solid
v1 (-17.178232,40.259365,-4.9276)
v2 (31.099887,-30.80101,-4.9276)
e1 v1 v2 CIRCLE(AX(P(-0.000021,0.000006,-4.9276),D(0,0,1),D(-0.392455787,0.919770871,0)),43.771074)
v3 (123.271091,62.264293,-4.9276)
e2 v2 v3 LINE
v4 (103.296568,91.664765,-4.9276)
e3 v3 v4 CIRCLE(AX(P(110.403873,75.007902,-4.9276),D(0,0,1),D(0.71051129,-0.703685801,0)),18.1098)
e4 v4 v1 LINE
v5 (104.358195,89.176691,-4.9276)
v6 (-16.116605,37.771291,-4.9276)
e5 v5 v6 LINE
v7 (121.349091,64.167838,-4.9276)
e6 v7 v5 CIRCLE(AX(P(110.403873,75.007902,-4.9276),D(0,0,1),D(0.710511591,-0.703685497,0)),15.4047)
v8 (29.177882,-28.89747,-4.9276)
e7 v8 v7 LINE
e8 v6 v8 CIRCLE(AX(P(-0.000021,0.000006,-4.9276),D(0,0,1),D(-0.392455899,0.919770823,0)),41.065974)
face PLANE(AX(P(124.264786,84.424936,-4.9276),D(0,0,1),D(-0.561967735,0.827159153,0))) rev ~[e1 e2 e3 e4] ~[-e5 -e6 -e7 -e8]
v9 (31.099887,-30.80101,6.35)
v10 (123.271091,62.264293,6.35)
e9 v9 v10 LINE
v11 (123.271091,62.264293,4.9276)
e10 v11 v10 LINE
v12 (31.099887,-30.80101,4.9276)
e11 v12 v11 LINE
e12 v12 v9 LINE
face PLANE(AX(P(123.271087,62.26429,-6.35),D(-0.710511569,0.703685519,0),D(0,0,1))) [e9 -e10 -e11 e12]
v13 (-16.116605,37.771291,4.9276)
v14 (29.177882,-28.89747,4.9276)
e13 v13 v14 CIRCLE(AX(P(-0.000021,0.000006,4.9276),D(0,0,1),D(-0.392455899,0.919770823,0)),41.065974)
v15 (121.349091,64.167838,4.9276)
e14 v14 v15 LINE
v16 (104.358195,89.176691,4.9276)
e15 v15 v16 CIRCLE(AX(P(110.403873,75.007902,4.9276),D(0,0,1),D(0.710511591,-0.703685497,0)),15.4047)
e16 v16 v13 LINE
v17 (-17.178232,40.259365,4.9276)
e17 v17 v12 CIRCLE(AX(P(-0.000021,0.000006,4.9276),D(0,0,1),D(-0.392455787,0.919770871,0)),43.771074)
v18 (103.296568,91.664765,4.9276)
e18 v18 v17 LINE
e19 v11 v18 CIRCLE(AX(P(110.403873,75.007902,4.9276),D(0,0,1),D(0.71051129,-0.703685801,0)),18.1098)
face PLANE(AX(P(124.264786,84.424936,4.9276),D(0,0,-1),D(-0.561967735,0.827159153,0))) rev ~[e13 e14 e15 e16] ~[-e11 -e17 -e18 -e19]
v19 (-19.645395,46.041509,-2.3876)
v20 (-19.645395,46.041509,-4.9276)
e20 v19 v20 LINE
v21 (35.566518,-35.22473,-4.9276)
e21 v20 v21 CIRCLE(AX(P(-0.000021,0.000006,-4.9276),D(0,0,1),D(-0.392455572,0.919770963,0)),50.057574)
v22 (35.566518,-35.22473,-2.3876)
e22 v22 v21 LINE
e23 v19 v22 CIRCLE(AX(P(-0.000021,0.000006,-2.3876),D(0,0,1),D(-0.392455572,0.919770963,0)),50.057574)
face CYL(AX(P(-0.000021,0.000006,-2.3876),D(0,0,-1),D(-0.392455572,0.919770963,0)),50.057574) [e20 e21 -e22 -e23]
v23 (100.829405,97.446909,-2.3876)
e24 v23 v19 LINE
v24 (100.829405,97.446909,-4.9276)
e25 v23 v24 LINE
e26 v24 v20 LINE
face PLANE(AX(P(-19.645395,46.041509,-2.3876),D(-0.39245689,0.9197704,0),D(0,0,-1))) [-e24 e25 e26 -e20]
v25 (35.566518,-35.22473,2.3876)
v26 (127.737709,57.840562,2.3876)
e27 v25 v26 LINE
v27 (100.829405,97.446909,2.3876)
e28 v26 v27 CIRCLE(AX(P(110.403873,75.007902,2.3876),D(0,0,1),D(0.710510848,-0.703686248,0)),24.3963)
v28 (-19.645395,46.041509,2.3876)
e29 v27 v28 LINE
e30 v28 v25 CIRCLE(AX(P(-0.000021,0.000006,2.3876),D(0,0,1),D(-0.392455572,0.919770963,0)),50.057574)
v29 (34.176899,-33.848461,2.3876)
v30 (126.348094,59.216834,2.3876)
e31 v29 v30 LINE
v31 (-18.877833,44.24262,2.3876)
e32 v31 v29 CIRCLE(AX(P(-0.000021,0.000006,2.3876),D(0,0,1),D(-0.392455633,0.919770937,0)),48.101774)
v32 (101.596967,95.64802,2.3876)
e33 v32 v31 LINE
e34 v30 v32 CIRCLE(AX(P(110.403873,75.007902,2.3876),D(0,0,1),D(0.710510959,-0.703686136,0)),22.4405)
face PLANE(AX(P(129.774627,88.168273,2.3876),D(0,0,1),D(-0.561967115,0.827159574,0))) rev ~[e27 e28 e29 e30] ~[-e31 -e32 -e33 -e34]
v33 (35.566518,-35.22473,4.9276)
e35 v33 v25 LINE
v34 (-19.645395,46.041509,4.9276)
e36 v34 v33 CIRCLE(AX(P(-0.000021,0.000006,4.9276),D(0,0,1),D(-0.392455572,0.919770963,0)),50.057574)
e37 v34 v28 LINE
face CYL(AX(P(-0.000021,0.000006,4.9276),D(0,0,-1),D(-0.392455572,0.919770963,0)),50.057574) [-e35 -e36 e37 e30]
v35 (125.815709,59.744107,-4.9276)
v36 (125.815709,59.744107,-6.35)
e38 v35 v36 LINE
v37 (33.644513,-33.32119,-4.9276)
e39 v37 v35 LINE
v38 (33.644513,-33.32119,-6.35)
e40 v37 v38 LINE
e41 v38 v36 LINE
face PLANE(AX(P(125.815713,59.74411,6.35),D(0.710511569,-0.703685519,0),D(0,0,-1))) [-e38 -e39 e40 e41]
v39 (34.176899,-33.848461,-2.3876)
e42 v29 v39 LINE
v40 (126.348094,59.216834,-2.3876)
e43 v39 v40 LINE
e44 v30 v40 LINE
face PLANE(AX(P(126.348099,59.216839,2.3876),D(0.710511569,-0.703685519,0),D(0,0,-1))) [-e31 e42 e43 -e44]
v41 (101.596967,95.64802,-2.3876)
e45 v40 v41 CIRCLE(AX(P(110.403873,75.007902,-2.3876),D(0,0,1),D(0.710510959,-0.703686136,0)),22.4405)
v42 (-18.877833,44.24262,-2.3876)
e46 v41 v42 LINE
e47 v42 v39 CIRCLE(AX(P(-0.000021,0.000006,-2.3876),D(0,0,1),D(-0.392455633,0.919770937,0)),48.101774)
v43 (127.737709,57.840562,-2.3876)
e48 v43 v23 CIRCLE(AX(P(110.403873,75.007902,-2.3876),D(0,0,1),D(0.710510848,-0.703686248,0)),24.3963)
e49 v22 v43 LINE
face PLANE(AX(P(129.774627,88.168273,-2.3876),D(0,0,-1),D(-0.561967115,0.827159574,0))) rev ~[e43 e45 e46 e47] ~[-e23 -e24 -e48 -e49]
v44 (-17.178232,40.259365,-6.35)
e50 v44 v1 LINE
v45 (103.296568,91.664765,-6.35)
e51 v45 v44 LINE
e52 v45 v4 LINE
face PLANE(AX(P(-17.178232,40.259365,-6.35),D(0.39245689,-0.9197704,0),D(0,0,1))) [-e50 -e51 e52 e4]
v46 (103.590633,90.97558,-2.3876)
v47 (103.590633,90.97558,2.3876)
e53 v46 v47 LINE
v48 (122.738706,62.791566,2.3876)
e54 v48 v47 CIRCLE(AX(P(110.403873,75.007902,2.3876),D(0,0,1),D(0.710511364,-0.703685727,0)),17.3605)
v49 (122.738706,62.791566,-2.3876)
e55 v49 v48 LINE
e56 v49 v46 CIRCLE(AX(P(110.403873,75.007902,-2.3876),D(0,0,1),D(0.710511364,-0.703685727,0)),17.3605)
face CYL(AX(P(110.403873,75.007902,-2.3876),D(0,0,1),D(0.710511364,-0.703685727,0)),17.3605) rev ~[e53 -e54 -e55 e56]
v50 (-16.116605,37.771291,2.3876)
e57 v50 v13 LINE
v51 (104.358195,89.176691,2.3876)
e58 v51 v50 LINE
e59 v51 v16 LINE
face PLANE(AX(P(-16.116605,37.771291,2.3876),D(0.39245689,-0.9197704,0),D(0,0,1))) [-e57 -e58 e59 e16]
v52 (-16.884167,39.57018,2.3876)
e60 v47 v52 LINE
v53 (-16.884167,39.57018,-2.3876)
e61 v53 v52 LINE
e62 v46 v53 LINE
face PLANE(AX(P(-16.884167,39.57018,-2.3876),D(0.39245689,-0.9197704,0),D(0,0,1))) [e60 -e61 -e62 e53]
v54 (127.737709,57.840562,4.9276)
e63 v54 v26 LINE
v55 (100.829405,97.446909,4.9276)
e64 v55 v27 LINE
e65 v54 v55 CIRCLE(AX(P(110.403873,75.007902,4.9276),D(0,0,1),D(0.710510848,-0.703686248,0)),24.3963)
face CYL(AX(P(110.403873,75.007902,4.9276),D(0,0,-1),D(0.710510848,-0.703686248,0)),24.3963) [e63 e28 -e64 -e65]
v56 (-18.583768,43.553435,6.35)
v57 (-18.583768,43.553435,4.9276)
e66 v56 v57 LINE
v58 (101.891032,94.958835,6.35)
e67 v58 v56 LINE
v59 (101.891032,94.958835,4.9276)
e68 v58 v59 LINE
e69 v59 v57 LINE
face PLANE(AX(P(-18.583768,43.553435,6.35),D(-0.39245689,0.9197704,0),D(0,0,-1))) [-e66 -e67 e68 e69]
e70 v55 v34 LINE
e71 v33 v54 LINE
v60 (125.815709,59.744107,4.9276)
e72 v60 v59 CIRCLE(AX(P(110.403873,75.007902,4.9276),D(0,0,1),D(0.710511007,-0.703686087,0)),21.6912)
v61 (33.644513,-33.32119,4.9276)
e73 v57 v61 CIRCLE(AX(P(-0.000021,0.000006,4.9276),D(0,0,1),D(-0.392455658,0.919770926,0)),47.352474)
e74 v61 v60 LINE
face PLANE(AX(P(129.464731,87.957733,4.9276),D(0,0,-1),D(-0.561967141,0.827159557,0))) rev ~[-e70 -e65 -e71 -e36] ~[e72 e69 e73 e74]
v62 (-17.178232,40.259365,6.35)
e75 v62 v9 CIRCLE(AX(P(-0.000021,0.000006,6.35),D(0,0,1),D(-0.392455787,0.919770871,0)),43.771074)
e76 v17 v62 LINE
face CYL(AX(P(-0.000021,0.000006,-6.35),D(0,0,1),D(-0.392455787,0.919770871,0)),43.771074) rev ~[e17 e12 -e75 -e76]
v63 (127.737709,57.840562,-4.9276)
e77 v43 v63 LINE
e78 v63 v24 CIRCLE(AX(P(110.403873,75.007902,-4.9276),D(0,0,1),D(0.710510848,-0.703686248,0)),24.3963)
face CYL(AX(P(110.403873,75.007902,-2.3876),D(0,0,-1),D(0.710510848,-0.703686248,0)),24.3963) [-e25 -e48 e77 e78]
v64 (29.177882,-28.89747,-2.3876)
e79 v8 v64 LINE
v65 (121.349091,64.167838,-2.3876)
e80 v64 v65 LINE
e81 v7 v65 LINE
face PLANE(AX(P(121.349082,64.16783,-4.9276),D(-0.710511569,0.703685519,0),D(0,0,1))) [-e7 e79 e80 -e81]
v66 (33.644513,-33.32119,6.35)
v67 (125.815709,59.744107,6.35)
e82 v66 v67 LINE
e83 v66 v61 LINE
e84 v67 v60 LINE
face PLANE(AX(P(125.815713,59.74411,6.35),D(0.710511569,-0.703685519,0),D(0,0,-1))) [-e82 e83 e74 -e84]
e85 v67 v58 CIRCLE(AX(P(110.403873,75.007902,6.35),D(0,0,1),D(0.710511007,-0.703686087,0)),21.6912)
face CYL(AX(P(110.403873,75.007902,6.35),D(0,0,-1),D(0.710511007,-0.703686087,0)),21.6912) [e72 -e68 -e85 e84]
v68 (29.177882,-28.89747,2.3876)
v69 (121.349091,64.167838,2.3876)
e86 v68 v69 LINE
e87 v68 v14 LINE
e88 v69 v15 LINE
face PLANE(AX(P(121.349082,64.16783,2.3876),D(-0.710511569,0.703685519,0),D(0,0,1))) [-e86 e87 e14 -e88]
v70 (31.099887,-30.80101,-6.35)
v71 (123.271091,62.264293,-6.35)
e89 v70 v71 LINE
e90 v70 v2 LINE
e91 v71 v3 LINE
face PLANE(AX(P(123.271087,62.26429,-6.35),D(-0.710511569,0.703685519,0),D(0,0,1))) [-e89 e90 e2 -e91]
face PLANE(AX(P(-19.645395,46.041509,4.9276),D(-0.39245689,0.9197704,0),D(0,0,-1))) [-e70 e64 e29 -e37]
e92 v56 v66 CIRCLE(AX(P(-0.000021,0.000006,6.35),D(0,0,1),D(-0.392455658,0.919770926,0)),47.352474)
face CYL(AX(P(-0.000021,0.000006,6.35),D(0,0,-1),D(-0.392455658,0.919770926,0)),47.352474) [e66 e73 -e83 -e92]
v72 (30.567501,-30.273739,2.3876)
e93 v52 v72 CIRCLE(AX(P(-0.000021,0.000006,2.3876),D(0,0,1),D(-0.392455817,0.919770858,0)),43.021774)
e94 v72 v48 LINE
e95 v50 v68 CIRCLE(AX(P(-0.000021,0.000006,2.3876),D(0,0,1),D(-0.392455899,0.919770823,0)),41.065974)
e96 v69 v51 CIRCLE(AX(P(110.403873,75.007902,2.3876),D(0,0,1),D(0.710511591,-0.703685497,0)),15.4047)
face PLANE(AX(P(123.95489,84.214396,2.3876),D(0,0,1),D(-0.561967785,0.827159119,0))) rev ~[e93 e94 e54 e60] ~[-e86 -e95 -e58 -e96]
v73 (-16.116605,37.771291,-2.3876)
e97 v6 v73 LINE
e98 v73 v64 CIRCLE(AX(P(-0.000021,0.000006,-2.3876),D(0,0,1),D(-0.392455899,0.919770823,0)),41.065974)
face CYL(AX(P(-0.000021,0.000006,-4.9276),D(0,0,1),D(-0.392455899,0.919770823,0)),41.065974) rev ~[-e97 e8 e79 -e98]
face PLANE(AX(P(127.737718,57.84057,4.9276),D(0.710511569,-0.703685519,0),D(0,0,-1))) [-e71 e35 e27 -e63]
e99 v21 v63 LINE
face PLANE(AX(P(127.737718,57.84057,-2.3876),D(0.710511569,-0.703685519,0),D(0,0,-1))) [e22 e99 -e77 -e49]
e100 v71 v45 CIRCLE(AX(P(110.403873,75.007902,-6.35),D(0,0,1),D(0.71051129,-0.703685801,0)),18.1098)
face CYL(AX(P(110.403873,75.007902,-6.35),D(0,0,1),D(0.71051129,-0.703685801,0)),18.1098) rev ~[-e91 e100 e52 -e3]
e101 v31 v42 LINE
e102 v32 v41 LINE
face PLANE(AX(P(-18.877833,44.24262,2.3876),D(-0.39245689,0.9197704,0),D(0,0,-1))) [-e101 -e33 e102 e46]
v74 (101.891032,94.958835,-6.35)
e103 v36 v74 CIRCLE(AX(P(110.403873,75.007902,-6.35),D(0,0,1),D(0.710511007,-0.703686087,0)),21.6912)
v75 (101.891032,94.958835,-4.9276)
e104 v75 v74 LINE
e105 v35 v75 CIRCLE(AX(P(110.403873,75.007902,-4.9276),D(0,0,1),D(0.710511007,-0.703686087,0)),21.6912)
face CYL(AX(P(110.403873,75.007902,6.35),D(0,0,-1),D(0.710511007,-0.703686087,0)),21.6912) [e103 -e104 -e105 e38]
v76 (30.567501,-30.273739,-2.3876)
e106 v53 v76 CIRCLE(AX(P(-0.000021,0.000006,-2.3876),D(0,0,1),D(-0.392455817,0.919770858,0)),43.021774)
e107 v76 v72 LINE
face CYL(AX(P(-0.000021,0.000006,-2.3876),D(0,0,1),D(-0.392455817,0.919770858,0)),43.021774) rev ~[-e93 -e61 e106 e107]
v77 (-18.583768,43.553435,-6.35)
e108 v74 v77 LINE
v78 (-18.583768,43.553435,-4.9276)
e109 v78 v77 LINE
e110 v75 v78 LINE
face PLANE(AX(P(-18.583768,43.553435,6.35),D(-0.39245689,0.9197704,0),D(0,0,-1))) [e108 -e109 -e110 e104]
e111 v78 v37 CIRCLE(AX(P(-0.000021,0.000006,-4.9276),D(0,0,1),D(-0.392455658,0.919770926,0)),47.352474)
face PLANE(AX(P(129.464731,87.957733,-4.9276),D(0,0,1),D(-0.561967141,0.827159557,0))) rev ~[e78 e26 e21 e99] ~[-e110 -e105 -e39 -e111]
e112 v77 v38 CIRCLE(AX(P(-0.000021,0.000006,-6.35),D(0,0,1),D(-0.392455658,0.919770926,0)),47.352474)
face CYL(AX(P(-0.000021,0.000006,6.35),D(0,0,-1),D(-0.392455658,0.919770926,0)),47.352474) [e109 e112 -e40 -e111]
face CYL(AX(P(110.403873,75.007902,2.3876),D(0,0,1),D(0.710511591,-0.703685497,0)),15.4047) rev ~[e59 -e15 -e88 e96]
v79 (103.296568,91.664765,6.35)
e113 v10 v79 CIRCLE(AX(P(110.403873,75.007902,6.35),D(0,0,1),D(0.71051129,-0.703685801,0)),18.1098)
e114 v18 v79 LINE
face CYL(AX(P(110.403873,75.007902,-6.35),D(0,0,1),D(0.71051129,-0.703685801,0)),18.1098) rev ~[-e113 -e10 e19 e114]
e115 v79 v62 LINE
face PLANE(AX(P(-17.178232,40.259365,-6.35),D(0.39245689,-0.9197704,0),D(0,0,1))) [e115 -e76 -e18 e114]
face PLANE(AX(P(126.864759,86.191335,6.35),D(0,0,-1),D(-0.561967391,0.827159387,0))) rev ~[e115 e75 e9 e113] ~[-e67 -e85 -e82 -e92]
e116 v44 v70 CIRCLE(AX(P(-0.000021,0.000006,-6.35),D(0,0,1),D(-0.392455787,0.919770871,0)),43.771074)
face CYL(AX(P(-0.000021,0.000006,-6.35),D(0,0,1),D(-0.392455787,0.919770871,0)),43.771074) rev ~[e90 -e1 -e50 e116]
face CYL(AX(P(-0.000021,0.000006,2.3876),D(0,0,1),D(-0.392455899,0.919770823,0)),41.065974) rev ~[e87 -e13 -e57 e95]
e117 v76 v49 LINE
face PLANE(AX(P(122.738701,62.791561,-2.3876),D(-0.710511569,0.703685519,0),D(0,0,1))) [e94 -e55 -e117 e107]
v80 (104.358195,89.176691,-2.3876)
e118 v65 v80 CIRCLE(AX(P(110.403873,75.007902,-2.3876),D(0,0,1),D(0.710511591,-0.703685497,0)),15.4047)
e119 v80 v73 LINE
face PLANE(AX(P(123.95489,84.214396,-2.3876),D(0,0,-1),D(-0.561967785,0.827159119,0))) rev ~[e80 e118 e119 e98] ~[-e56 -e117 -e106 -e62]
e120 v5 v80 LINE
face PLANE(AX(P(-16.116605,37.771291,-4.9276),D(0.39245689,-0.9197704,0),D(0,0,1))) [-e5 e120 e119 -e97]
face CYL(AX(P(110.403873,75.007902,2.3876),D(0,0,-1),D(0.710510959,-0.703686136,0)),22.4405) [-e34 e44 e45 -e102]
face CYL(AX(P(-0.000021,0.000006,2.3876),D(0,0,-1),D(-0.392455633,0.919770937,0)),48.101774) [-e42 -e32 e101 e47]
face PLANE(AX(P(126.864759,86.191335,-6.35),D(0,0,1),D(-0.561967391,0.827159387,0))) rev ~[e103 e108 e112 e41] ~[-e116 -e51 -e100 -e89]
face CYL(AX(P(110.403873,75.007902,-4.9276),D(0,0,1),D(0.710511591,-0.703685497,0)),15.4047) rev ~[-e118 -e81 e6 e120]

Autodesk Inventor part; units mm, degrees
ref_plane "Work Plane2" through (0, 0, 0) normal (-1, 0, 0) x (0, 0, 1)
ref_plane "Work Plane3" through (110.4039, 75.0079, 0) normal (-0.9492457, -0.3145356, 0) x (0, 0, 1)
sketch "Path" plane through (0, 0, 0) normal (0, 0, 1) x (1, 0, 0)
  arc A0 (-17.881, 41.9064) -> (32.3722, -32.0611) centre (0, 0) ccw
  arc A1 (124.5434, 61.0042) -> (102.5938, 93.3118) centre (110.4039, 75.0079) ccw
  line L0 (124.5434, 61.0042) -> (32.3722, -32.0611)
  line L1 (-17.881, 41.9064) -> (102.5938, 93.3118)
  dimension "d31" = 8.9916
ref_plane "Section Plane" through (32.3722, -32.0611, 0) normal (0.7036856, 0.7105115, 0) x (0, 0, 1)
sketch "Section Sketch" plane through (32.3722, -32.0611, 0) normal (0.7036856, 0.7105115, 0) x (0, 0, 1)
  line L0 (-6.35, -1.7907) -> (6.35, -1.7907)
  line L1 (6.35, -1.7907) -> (6.35, 1.7907)
  line L2 (6.35, 1.7907) -> (-6.35, 1.7907)
  line L3 (-6.35, 1.7907) -> (-6.35, -1.7907)
  line L4 (-2.3876, -2.54) -> (2.3876, -2.54)
  line L5 (2.3876, -2.54) -> (2.3876, 2.54)
  line L6 (2.3876, 2.54) -> (-2.3876, 2.54)
  line L7 (-2.3876, 2.54) -> (-2.3876, -2.54)
  line L8 (-2.3876, 0) -> (2.3876, 0) construction
  line L9 (-4.9276, -4.4958) -> (-2.3876, -4.4958)
  line L10 (-2.3876, -4.4958) -> (-2.3876, 4.4958)
  line L11 (-2.3876, 4.4958) -> (-4.9276, 4.4958)
  line L12 (-4.9276, 4.4958) -> (-4.9276, -4.4958)
  line L13 (2.3876, -4.4958) -> (4.9276, -4.4958)
  line L14 (4.9276, -4.4958) -> (4.9276, 4.4958)
  line L15 (4.9276, 4.4958) -> (2.3876, 4.4958)
  line L16 (2.3876, 4.4958) -> (2.3876, -4.4958)
  line L17 (-6.35, 0) -> (6.35, 0) construction
  point P0 (0, 0)
  point P1 (0, 0)
  dimension "d21" = 3.5814
  dimension "d22" = 5.08
  dimension "d23" = 4.7752
  dimension "d24" = 2.54
  dimension "d31" = 8.9916
  dimension "d32" = 12.7
sweep "Solid" add profiles "Section Sketch" path "Path"
pattern_of_one "Strand Pattern"
equation "\"d21\" = da_d2"
equation "\"d22\" = da_d1"
equation "\"d23\" = da_b1"
equation "\"d24\" = da_t1 + da_t2"
equation "\"d30\" = da_pt"
equation "\"da_p\" = 9.525"
equation "\"da_b1\" = 4.7752"
equation "\"da_h2\" = 8.9916"
equation "\"da_h3\" = 7.7978"
equation "\"da_d1\" = 5.08"
equation "\"da_d2\" = 3.5814"
equation "\"da_pt\" = 10.1346"
equation "\"da_b\" = 12.7"
equation "\"da_t1\" = 1.27"
equation "\"da_t2\" = 1.27"
properties part number "Roller Chain"
